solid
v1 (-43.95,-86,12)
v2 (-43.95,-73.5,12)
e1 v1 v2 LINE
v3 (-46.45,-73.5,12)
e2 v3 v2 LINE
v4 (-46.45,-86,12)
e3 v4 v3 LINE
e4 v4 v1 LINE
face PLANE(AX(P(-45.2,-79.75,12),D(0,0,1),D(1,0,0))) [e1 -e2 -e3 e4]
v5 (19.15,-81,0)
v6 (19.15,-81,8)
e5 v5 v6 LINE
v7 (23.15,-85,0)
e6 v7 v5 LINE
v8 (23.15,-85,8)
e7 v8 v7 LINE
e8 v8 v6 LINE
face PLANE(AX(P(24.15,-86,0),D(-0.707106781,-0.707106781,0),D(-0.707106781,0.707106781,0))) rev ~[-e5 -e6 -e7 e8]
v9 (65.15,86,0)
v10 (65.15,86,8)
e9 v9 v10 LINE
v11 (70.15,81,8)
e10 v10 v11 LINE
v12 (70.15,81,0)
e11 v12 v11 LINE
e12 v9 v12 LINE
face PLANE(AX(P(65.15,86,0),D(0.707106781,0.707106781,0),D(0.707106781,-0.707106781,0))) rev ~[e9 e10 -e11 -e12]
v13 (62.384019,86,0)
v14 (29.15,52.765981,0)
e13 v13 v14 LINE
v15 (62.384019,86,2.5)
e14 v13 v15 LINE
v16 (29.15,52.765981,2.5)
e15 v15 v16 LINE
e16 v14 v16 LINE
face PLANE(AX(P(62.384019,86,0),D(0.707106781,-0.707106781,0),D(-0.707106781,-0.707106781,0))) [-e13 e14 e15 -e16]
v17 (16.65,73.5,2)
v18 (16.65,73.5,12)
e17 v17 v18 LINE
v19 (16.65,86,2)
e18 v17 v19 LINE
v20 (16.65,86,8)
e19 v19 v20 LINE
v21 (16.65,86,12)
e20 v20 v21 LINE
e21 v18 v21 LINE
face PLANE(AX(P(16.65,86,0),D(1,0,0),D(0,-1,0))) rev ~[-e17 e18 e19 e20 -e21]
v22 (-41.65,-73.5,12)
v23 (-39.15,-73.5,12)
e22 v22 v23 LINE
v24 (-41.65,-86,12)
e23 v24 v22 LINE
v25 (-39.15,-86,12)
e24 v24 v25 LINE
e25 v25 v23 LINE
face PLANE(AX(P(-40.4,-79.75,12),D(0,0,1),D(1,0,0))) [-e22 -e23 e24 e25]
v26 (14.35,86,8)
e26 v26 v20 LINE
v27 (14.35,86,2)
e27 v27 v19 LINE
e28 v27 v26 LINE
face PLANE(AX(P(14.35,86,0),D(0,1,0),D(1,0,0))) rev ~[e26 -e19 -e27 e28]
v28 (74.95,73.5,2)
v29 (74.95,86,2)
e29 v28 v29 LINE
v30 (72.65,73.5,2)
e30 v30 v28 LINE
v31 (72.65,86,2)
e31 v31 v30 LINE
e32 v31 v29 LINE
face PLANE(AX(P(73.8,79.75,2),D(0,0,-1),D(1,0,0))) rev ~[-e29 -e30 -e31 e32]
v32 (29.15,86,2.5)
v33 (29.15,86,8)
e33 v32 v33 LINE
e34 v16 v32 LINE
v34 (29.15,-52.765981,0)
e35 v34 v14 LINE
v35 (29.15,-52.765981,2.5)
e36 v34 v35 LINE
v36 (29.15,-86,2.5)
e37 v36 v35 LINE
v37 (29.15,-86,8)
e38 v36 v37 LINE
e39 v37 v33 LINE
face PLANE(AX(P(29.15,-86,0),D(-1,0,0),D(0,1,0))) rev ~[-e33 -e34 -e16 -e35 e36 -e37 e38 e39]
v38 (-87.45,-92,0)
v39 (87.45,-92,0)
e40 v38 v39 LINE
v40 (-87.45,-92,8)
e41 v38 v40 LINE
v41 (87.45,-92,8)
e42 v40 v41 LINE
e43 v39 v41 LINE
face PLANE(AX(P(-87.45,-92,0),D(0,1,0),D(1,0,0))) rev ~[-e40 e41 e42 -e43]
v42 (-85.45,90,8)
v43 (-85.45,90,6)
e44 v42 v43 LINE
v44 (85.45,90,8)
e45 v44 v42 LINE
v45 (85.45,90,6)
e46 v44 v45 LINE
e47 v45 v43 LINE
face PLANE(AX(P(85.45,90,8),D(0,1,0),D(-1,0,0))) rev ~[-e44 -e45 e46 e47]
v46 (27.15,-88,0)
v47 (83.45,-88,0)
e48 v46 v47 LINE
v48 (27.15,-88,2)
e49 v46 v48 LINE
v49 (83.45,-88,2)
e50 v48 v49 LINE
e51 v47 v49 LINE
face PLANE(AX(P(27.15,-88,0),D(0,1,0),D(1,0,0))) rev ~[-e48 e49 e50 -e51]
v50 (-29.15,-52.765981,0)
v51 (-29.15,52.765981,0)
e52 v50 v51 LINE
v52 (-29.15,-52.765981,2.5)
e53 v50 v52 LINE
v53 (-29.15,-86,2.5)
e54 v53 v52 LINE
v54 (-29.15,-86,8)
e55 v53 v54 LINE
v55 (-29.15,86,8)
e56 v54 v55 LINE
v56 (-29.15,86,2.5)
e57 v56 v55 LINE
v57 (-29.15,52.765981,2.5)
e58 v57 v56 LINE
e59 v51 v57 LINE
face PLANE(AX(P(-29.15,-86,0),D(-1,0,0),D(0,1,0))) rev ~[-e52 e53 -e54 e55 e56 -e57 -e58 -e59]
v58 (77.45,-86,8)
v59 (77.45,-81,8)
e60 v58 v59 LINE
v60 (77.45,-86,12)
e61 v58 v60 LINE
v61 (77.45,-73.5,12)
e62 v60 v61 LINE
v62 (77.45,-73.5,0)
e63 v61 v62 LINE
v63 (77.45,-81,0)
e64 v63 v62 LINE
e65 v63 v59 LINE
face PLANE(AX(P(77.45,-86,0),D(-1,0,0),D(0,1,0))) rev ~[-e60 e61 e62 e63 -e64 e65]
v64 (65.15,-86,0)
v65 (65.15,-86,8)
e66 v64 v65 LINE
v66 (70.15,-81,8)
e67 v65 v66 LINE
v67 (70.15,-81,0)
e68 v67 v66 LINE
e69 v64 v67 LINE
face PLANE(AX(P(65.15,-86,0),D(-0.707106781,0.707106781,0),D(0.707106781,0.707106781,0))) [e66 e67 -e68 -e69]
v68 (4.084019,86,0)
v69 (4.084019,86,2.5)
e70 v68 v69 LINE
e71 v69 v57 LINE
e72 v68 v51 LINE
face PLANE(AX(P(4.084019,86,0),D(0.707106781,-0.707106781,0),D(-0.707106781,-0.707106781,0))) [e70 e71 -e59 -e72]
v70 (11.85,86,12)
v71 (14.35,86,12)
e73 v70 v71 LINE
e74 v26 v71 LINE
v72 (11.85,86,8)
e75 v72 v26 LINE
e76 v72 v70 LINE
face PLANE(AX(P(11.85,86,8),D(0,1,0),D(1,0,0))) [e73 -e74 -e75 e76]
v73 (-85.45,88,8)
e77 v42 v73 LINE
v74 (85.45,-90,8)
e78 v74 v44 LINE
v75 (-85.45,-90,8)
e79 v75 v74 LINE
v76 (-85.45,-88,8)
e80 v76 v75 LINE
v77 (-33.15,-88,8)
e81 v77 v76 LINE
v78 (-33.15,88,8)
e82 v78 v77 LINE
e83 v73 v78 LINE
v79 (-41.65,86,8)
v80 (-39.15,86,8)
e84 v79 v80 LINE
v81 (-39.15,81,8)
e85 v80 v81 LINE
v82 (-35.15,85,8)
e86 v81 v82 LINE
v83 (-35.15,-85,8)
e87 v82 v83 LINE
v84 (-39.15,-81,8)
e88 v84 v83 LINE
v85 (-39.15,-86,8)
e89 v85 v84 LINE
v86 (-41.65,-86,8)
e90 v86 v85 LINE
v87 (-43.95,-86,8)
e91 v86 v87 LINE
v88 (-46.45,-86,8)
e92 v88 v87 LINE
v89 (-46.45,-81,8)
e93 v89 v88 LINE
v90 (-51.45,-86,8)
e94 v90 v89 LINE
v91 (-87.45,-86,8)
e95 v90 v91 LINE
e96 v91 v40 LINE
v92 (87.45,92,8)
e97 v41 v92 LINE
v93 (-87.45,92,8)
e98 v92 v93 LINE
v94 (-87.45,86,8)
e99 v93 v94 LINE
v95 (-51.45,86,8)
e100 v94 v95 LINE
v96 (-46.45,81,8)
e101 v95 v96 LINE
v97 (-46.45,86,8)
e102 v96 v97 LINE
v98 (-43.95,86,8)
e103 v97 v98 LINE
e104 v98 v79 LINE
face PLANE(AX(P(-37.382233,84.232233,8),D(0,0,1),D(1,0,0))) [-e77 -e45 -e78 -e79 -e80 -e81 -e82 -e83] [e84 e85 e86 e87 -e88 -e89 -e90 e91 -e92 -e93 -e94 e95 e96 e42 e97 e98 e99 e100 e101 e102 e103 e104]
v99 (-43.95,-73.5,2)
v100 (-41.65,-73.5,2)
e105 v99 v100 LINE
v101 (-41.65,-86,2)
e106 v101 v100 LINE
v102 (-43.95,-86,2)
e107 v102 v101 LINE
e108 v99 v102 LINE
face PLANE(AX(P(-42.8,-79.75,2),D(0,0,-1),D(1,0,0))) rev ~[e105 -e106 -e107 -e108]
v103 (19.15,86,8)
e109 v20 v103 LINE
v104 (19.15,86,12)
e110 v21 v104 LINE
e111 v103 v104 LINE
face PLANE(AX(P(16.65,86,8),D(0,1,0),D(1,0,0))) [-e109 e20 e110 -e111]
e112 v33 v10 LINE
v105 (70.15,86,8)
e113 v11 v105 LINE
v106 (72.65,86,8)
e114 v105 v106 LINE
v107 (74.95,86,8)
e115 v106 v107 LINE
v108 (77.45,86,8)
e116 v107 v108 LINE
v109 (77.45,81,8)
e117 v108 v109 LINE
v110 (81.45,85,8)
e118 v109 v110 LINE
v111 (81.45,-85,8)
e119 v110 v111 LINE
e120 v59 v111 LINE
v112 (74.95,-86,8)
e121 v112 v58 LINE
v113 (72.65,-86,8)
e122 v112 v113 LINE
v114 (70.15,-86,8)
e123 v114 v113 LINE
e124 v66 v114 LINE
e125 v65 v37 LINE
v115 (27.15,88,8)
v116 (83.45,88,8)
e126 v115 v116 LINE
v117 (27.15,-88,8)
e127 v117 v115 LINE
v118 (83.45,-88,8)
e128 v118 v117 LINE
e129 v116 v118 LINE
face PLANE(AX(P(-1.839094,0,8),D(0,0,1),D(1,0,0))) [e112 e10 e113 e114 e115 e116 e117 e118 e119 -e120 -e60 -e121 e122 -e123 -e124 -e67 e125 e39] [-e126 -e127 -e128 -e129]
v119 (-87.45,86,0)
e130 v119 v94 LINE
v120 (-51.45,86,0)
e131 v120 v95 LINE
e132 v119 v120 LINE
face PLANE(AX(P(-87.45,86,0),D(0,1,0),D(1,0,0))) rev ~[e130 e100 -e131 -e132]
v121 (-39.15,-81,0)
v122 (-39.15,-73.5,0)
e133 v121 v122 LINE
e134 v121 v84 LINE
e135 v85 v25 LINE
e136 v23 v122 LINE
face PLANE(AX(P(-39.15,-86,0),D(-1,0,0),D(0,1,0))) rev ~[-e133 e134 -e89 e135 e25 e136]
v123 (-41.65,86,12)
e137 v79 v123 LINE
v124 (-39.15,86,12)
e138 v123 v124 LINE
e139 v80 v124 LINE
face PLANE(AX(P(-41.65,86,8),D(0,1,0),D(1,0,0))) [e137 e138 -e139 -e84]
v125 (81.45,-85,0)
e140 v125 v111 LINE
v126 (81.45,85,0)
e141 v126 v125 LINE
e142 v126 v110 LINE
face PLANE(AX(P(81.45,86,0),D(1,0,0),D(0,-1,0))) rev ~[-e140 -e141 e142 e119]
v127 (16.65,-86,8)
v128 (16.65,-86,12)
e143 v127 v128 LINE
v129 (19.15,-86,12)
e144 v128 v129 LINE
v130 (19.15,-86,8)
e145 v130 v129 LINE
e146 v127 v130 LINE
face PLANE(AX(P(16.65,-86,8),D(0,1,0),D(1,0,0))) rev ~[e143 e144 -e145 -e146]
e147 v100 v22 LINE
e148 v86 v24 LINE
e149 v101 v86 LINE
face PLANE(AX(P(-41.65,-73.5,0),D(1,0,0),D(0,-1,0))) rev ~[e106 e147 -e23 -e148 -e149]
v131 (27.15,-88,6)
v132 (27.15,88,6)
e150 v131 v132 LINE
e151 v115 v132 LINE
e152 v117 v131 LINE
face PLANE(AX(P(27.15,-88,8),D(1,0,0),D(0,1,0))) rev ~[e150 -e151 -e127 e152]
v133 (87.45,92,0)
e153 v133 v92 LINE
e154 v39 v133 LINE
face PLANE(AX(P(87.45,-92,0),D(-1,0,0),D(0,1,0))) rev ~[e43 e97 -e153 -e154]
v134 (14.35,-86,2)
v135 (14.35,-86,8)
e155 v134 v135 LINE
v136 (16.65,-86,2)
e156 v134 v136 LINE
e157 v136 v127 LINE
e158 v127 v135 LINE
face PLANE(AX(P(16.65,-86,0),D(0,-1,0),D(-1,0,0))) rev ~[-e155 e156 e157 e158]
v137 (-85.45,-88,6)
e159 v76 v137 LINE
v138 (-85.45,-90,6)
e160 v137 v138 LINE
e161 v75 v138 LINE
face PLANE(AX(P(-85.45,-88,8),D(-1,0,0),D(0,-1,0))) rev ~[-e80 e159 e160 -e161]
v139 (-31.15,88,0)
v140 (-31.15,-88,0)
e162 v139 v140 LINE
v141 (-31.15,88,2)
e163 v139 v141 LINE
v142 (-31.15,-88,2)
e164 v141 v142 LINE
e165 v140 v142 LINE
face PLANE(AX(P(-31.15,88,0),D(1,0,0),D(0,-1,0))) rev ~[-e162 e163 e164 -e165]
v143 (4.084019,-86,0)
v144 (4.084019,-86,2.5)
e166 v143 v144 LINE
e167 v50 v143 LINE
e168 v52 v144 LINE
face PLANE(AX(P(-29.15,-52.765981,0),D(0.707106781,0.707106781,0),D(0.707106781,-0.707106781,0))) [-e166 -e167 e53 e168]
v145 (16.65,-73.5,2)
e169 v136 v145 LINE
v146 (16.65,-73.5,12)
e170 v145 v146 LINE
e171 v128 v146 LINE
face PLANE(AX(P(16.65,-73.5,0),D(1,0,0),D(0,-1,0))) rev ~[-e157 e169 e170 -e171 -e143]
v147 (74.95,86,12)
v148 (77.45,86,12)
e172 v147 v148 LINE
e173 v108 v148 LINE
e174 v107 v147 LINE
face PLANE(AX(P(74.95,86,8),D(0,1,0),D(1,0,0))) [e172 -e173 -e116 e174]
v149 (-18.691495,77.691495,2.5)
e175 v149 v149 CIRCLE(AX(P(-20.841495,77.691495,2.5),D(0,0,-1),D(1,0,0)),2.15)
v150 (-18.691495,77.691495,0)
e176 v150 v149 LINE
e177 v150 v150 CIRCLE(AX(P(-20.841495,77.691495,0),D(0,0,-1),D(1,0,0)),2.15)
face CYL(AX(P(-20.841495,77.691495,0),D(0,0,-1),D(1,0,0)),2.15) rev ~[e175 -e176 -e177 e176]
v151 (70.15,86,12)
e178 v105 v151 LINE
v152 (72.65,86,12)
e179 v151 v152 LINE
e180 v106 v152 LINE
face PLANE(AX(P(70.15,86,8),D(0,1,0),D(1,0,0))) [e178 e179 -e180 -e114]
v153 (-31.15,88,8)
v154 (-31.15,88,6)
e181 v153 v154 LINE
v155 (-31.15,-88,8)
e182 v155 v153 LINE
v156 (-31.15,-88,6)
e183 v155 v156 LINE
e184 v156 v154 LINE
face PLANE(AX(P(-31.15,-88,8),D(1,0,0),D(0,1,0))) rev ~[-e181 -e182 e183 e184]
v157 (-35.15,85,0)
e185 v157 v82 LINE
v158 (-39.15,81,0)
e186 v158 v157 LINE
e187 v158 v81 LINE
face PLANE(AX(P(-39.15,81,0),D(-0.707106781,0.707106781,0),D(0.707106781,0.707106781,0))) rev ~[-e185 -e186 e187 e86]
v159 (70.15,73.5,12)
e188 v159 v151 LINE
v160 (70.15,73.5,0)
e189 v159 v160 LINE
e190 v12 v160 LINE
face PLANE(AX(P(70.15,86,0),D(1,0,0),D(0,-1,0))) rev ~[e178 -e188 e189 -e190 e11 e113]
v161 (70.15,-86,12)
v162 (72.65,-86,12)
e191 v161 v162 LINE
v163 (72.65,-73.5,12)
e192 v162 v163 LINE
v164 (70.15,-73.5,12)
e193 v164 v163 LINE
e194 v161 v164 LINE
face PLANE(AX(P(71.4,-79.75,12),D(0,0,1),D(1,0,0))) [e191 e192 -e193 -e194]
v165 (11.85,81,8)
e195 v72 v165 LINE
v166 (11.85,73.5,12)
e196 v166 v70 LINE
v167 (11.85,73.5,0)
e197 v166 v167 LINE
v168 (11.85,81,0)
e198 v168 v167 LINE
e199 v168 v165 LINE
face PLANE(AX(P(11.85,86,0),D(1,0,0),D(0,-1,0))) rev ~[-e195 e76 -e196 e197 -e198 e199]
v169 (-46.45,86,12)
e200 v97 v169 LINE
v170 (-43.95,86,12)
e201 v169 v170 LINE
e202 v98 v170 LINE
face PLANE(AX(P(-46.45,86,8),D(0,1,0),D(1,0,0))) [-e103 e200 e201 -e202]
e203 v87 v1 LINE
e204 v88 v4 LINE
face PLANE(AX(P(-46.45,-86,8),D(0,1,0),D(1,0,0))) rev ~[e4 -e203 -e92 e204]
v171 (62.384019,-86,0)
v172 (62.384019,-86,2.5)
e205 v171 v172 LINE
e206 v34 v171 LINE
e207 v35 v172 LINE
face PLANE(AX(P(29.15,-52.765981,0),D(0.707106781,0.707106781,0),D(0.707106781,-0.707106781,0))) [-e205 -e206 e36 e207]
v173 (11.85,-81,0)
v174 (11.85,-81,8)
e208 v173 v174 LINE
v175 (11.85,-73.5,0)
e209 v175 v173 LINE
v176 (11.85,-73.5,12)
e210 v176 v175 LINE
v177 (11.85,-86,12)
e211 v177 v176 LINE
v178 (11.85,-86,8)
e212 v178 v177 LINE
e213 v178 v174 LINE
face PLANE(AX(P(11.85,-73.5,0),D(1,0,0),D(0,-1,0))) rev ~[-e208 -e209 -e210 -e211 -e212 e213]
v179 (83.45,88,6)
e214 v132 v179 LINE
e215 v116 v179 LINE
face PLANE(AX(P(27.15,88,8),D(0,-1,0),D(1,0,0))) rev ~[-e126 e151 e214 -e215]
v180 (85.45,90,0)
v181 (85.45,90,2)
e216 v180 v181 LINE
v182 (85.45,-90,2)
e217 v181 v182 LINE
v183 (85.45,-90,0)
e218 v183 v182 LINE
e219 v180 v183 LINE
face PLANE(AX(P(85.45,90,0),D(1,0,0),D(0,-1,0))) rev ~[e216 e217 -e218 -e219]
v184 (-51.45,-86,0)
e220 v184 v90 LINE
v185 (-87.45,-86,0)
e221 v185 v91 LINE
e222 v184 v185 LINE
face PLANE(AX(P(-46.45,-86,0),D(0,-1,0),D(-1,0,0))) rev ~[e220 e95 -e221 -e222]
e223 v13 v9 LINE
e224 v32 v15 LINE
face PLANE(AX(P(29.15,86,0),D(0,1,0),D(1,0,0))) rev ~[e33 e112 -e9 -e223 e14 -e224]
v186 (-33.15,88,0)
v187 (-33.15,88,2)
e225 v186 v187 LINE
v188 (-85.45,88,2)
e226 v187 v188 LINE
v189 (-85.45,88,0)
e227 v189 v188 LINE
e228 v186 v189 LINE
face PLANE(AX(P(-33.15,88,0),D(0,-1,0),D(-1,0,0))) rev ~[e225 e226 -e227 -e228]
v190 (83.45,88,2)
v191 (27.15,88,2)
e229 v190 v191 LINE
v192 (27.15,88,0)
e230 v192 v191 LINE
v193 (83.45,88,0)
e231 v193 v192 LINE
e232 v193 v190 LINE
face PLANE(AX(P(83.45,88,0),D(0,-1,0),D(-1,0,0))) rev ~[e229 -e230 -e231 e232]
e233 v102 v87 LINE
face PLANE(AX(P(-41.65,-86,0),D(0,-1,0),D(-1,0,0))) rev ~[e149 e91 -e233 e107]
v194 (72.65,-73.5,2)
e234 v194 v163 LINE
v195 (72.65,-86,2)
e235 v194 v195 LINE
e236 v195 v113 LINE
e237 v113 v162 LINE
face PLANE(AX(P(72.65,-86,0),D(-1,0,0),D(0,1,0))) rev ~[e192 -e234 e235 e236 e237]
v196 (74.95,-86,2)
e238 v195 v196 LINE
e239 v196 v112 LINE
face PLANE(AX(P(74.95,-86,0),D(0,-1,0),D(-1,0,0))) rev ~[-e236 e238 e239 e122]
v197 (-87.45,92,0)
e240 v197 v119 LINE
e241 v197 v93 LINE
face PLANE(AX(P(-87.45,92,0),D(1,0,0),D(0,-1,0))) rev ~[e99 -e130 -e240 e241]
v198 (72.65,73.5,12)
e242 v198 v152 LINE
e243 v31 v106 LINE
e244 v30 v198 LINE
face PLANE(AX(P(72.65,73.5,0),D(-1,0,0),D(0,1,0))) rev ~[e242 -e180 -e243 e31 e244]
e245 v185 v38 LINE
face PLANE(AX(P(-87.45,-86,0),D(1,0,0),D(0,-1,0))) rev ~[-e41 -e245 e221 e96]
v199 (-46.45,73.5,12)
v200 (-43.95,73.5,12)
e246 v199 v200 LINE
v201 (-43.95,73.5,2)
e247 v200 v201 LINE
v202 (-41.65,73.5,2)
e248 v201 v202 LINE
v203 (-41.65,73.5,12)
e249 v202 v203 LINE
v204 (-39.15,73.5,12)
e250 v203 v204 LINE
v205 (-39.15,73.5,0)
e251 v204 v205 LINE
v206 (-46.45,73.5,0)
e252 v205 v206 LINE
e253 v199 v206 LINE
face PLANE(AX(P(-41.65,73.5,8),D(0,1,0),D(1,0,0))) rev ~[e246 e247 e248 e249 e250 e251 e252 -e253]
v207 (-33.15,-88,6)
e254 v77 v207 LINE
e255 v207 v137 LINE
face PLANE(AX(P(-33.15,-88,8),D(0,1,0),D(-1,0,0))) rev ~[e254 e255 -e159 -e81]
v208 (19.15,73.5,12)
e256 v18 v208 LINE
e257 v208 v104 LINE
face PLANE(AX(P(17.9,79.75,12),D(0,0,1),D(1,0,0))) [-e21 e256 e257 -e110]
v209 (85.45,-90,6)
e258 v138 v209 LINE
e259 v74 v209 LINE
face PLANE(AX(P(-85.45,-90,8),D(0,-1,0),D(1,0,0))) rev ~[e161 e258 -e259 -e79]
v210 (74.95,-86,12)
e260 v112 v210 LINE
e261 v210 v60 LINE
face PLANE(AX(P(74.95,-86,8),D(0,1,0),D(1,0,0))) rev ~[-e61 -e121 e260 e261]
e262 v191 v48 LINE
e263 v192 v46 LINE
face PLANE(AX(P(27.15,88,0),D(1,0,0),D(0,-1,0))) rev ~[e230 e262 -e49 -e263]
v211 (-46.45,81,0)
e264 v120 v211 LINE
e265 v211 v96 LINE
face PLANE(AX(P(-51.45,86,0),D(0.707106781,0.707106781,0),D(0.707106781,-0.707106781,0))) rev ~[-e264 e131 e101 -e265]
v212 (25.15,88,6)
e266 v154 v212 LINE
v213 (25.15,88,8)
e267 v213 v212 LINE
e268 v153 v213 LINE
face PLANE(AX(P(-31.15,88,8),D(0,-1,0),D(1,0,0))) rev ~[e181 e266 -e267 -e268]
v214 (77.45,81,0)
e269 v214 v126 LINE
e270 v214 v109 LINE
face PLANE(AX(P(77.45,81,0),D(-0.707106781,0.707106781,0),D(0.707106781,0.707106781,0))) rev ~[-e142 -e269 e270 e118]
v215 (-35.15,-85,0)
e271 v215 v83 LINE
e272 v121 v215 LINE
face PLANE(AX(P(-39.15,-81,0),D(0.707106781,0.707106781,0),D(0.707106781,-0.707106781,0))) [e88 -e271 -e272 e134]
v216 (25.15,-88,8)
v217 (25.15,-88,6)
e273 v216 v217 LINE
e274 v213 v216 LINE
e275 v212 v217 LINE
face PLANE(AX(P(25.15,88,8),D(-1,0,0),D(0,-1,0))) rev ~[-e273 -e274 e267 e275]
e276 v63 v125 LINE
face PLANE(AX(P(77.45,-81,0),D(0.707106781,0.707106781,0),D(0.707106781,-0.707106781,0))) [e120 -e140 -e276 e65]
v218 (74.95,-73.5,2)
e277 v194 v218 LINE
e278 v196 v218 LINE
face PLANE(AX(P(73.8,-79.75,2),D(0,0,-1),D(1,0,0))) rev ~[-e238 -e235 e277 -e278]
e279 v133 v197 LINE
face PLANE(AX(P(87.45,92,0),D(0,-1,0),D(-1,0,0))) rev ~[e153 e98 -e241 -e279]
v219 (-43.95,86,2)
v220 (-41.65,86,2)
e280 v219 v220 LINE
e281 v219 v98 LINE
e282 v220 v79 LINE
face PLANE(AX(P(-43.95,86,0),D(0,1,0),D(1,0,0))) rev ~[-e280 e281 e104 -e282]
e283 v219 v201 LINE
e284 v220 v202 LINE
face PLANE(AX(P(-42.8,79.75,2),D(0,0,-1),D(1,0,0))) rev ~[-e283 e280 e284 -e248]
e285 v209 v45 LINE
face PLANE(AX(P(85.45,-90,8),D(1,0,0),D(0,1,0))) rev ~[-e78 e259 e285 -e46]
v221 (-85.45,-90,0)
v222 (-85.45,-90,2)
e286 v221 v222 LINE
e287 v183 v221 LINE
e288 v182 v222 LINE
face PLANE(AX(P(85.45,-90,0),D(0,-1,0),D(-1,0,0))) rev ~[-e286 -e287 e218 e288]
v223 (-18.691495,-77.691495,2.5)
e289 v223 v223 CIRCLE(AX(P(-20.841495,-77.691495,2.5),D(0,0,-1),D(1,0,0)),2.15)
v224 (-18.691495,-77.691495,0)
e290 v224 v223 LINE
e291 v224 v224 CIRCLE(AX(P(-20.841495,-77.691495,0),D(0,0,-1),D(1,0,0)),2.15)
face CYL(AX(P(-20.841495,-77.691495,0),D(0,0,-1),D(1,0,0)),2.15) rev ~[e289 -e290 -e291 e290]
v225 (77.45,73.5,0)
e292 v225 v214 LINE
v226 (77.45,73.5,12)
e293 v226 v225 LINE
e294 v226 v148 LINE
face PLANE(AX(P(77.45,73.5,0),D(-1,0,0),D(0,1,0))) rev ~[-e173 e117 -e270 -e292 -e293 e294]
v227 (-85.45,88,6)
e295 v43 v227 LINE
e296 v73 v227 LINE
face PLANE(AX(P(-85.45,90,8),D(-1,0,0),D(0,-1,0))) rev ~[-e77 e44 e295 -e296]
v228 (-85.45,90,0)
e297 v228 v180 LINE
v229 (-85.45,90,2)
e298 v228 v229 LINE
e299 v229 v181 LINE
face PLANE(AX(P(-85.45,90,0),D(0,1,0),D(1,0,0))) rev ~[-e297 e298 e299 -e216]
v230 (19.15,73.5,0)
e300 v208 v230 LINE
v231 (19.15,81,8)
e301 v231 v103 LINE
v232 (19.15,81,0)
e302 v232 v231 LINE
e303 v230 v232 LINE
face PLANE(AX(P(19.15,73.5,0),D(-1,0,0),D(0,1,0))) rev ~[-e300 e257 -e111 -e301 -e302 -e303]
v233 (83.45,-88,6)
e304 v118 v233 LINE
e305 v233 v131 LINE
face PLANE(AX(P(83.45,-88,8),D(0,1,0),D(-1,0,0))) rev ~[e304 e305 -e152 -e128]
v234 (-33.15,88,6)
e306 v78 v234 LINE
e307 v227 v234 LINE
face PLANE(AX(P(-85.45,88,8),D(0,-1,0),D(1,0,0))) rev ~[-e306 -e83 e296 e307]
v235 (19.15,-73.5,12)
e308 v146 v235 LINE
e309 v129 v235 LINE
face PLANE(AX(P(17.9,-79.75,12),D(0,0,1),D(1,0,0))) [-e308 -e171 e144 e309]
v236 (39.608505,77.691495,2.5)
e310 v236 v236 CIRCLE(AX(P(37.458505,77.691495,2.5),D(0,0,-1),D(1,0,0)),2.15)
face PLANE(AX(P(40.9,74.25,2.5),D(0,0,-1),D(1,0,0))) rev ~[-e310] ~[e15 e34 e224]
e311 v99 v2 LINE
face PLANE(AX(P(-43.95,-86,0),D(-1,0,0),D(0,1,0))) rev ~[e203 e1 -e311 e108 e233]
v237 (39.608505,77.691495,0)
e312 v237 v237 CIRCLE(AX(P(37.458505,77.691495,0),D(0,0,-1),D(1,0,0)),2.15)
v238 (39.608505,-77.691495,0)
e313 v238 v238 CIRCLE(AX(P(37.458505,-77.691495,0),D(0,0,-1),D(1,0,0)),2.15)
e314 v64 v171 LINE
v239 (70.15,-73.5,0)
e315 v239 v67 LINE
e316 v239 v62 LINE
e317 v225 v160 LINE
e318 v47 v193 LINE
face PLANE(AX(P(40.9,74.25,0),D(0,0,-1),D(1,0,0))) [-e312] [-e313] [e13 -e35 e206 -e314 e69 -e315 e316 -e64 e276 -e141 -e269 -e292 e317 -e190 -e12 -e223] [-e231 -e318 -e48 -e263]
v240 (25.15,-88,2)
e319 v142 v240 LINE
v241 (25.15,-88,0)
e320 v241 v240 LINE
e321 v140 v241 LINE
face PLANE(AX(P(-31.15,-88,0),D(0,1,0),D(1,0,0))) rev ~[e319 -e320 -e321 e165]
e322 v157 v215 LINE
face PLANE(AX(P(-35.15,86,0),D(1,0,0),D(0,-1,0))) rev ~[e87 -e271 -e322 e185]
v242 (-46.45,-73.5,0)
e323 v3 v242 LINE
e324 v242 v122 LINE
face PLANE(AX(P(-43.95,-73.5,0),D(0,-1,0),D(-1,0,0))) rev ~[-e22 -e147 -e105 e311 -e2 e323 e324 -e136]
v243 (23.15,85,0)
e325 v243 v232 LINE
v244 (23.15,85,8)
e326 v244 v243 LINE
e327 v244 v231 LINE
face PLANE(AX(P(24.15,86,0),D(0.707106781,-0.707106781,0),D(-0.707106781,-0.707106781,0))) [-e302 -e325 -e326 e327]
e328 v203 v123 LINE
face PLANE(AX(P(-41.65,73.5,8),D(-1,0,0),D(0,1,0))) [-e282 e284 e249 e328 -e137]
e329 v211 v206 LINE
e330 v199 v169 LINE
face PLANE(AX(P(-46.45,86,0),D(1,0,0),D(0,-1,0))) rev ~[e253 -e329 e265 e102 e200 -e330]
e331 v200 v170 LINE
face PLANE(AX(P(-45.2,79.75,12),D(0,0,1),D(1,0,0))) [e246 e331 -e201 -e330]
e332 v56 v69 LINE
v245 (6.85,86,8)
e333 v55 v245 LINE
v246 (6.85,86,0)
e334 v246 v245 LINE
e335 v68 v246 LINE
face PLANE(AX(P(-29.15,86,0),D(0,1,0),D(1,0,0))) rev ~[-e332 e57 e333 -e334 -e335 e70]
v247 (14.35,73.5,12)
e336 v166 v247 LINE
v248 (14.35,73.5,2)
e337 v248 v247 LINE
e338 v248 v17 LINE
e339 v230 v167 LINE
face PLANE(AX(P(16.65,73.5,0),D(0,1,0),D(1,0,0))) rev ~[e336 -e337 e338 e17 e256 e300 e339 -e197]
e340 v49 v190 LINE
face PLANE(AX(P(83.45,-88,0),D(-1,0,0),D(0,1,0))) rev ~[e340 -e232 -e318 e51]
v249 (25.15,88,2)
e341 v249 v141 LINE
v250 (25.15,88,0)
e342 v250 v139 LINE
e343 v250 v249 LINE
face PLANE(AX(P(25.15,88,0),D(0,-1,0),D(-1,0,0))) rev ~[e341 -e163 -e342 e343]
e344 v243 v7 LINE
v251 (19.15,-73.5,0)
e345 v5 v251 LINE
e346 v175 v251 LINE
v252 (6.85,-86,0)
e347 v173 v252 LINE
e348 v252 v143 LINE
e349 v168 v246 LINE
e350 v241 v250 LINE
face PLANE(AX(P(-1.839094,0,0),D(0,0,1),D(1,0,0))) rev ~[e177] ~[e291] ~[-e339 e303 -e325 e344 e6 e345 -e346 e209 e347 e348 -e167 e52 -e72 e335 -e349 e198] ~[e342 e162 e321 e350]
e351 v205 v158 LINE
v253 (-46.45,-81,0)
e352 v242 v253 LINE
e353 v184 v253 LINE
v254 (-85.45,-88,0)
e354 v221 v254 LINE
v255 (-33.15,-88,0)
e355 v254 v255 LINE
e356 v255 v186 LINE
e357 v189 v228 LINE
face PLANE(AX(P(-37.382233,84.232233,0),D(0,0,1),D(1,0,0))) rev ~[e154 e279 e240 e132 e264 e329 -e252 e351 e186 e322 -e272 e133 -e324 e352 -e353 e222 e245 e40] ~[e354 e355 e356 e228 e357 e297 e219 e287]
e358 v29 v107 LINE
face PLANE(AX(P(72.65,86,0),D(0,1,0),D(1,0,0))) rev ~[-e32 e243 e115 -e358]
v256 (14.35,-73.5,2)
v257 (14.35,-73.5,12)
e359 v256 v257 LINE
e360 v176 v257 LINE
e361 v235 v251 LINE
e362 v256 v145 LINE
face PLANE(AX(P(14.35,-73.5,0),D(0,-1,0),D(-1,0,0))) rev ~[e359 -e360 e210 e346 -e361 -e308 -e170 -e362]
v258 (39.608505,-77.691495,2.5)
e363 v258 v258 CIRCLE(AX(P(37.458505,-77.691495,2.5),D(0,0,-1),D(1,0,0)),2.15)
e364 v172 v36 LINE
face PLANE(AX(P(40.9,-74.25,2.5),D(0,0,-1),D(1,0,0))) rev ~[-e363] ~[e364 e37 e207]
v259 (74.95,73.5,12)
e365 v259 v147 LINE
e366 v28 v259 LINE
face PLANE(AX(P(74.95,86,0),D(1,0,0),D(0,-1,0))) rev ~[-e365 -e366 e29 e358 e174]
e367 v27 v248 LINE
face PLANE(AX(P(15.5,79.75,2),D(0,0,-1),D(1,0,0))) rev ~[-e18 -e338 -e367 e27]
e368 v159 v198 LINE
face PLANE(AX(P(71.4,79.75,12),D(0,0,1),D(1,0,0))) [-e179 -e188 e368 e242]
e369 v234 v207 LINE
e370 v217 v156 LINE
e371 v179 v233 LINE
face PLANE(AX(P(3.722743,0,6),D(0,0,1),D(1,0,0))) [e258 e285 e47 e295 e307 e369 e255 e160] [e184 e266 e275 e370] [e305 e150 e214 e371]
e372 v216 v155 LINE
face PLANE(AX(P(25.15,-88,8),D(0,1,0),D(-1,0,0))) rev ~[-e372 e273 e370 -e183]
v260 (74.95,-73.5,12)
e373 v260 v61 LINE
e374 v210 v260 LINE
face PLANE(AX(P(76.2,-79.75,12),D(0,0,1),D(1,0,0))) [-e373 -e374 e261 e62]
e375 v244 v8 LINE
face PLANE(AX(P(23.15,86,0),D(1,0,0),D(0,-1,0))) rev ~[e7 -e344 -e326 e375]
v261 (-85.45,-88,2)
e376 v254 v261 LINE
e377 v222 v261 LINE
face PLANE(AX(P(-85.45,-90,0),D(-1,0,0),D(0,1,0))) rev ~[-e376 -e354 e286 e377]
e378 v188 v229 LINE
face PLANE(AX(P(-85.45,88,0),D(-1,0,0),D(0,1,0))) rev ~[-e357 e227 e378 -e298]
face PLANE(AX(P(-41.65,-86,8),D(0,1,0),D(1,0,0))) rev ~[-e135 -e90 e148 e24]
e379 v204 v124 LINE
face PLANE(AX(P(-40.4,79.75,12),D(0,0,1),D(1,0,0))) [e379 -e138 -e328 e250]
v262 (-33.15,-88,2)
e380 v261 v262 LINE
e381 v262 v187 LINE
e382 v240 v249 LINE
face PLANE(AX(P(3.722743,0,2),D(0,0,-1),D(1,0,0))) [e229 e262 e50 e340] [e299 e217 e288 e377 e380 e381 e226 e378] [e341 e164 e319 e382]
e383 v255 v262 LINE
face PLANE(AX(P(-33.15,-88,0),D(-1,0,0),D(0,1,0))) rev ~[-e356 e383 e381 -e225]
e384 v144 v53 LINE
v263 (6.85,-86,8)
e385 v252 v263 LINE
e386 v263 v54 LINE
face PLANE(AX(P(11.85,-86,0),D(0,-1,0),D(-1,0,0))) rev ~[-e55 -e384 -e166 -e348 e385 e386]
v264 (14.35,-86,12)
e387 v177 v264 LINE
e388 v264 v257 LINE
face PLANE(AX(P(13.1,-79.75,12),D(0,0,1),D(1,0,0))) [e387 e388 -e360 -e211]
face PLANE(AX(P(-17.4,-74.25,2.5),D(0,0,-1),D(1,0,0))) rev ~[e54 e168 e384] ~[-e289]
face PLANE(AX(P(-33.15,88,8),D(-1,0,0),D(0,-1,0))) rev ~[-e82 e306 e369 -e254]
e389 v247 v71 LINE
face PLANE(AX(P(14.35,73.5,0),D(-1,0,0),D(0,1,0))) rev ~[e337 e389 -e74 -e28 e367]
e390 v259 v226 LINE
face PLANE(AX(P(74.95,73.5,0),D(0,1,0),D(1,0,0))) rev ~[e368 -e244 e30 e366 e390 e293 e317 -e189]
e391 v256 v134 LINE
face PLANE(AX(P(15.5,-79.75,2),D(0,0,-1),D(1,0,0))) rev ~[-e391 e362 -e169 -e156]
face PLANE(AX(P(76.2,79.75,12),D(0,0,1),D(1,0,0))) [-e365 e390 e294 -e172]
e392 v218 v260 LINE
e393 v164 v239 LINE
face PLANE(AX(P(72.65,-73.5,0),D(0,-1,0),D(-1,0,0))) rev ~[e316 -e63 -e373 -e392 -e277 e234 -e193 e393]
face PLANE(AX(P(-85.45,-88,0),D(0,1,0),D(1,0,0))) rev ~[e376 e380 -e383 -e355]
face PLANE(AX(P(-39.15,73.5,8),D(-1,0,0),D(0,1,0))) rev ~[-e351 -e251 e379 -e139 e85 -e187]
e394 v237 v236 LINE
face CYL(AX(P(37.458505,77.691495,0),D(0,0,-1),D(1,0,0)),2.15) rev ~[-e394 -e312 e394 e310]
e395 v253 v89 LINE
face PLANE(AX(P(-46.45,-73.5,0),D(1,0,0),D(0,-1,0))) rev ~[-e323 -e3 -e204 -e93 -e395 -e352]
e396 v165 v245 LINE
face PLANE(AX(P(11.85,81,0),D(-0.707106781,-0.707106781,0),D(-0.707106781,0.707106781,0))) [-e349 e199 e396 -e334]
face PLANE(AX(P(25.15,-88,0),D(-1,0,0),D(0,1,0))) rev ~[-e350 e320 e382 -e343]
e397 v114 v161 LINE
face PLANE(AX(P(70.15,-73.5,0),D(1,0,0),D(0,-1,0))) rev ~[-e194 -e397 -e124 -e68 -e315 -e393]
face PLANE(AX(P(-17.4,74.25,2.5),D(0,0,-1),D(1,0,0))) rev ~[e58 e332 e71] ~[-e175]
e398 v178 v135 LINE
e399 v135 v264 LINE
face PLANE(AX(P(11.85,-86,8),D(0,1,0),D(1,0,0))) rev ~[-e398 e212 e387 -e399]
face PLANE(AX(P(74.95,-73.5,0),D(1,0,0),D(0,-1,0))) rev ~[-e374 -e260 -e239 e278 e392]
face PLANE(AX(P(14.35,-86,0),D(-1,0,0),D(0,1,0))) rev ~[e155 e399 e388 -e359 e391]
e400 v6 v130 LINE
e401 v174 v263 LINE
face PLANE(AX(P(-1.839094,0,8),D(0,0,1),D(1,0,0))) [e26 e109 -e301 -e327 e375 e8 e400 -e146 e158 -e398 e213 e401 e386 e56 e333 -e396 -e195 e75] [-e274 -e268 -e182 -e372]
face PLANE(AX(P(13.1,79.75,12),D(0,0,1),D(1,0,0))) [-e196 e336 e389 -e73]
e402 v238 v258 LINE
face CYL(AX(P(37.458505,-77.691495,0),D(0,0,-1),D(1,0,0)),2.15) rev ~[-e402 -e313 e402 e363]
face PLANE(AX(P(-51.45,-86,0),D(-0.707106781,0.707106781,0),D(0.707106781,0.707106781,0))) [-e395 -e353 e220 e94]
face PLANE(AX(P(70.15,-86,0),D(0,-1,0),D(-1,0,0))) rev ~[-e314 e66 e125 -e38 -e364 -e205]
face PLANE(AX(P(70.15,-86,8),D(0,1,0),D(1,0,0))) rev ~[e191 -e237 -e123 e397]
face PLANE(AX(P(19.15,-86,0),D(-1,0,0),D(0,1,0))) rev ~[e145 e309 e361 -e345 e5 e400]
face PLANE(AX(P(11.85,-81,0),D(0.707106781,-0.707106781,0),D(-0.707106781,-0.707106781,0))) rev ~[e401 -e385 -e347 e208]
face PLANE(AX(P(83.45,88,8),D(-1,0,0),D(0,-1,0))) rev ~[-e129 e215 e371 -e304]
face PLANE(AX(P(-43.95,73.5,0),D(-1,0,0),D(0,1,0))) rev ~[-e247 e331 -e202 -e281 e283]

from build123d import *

# Parameters (mm, degrees)
F1_DEPTH     = 8
F2_W         = 2.5
F2_H         = 12.5
F3_DEPTH     = 4
F4_W         = 7.3
F4_H         = 12.5
F5_DEPTH     = 2
F7_DEPTH     = 2
F9_DEPTH     = 2
F10_T1_DEPTH = 8
F11_R        = 2.15
F12_DEPTH    = 2.5


# Not quite as in the source:
# - a fillet or chamfer that OpenCascade refuses, or shapes differently, is made with other operations: its cross-section is extruded or revolved along the edge and cut away or added


with BuildPart() as f1:
    # F0 (on Top) → F1 (new body)
    with BuildSketch(Plane.XY):
        Polygon((87.45, 92), (-87.45, 92), (-87.45, 86), (-46.45, 86), (-46.45, 73.5), (-43.95, 73.5), (-43.95, 86), (-41.65, 86), (-41.65, 73.5), (-39.15, 73.5), (-39.15, 86), (-35.15, 86), (-35.15, 0), (-35.15, -86), (-39.15, -86), (-39.15, -73.5), (-41.65, -73.5), (-41.65, -86), (-43.95, -86), (-43.95, -73.5), (-46.45, -73.5), (-46.45, -86), (-87.45, -86), (-87.45, -92), (87.45, -92), (87.45, 0), align=None)
        Polygon((-29.15, -86), (-29.15, 0), (-29.15, 86), (11.85, 86), (11.85, 73.5), (14.35, 73.5), (14.35, 86), (16.65, 86), (16.65, 73.5), (19.15, 73.5), (19.15, 86), (23.15, 86), (23.15, 0), (23.15, -86), (19.15, -86), (19.15, -73.5), (16.65, -73.5), (16.65, -86), (14.35, -86), (14.35, -73.5), (11.85, -73.5), (11.85, -86), align=None, mode=Mode.SUBTRACT)
        Polygon((29.15, -86), (29.15, 0), (29.15, 86), (70.15, 86), (70.15, 73.5), (72.65, 73.5), (72.65, 86), (74.95, 86), (74.95, 73.5), (77.45, 73.5), (77.45, 86), (81.45, 86), (81.45, 0), (81.45, -86), (77.45, -86), (77.45, -73.5), (74.95, -73.5), (74.95, -86), (72.65, -86), (72.65, -73.5), (70.15, -73.5), (70.15, -86), align=None, mode=Mode.SUBTRACT)
    extrude(amount=F1_DEPTH)

    # F2 (on face) → F3 (join)
    with BuildSketch(Plane.XY.offset(8)):
        with Locations((-40.4, 79.75)):
            Rectangle(F2_W, F2_H)
        with Locations((-45.2, 79.75)):
            Rectangle(F2_W, F2_H)
        with Locations((13.1, 79.75)):
            Rectangle(F2_W, F2_H)
        with Locations((17.9, 79.75)):
            Rectangle(F2_W, F2_H)
        with Locations((76.2, 79.75)):
            Rectangle(F2_W, F2_H)
        with Locations((71.4, 79.75)):
            Rectangle(F2_W, F2_H)
        with Locations((76.2, -79.75)):
            Rectangle(F2_W, F2_H)
        with Locations((71.4, -79.75)):
            Rectangle(F2_W, F2_H)
        with Locations((-40.4, -79.75)):
            Rectangle(F2_W, F2_H)
        with Locations((-45.2, -79.75)):
            Rectangle(F2_W, F2_H)
        with Locations((17.9, -79.75)):
            Rectangle(F2_W, F2_H)
        with Locations((13.1, -79.75)):
            Rectangle(F2_W, F2_H)
    extrude(amount=F3_DEPTH)

    # F4 (on face) → F5 (join)
    with BuildSketch(Plane(origin=(0, 0, 0), x_dir=(1, 0, 0), z_dir=(0, 0, -1))):
        with Locations((-42.8, 79.75)):
            Rectangle(F4_W, F4_H)
        with Locations((15.5, 79.75)):
            Rectangle(F4_W, F4_H)
        with Locations((73.8, 79.75)):
            Rectangle(F4_W, F4_H)
        with Locations((15.5, -79.75)):
            Rectangle(F4_W, F4_H)
        with Locations((-42.8, -79.75)):
            Rectangle(F4_W, F4_H)
        with Locations((73.8, -79.75)):
            Rectangle(F4_W, F4_H)
    extrude(amount=-F5_DEPTH)

    # F6 (on face) → F7 (cut)
    with BuildSketch(Plane.XY.offset(8)):
        Polygon((85.45, 90), (-85.45, 90), (-85.45, 88), (-33.15, 88), (-33.15, 0), (-33.15, -88), (-85.45, -88), (-85.45, -90), (85.45, -90), (85.45, 0), align=None)
        Polygon((25.15, 88), (25.15, 0), (25.15, -88), (-31.15, -88), (-31.15, 0), (-31.15, 88), align=None, mode=Mode.SUBTRACT)
        Polygon((27.15, 88), (83.45, 88), (83.45, 0), (83.45, -88), (27.15, -88), (27.15, 0), align=None, mode=Mode.SUBTRACT)
    extrude(amount=-F7_DEPTH, mode=Mode.SUBTRACT)

    # F8 (on face) → F9 (cut)
    with BuildSketch(Plane(origin=(0, 0, 0), x_dir=(1, 0, 0), z_dir=(0, 0, -1))):
        Polygon((85.45, 90), (-85.45, 90), (-85.45, 88), (-33.15, 88), (-33.15, 0), (-33.15, -88), (-85.45, -88), (-85.45, -90), (85.45, -90), (85.45, 0), align=None)
        Polygon((25.15, 88), (25.15, 0), (25.15, -88), (-31.15, -88), (-31.15, 0), (-31.15, 88), align=None, mode=Mode.SUBTRACT)
        Polygon((27.15, 88), (83.45, 88), (83.45, 0), (83.45, -88), (27.15, -88), (27.15, 0), align=None, mode=Mode.SUBTRACT)
    extrude(amount=-F9_DEPTH, mode=Mode.SUBTRACT)

    # F10: chamfer of 5 on 12 edges, made by hand

    # F10_s2 → F10_t1 (join)
    with BuildSketch(Plane.XY):
        Polygon((-39.15, 81), (-34.15, 86), (-39.15, 86), align=None)
        Polygon((-51.45, 86), (-46.45, 81), (-46.45, 86), align=None)
        Polygon((11.85, 81), (6.85, 86), (11.85, 86), align=None)
        Polygon((24.15, 86), (19.15, 81), (19.15, 86), align=None)
        Polygon((77.45, 81), (82.45, 86), (77.45, 86), align=None)
        Polygon((65.15, 86), (70.15, 81), (70.15, 86), align=None)
        Polygon((77.45, -81), (82.45, -86), (77.45, -86), align=None)
        Polygon((65.15, -86), (70.15, -81), (70.15, -86), align=None)
        Polygon((11.85, -81), (6.85, -86), (11.85, -86), align=None)
        Polygon((-51.45, -86), (-46.45, -81), (-46.45, -86), align=None)
        Polygon((-39.15, -81), (-34.15, -86), (-39.15, -86), align=None)
        Polygon((24.15, -86), (19.15, -81), (19.15, -86), align=None)
    extrude(amount=F10_T1_DEPTH)

    # F11 (on face) → F12 (join)
    with BuildSketch(Plane(origin=(0, 0, 0), x_dir=(1, 0, 0), z_dir=(0, 0, -1))):
        Polygon((29.15, -52.7659812842), (29.15, -86), (62.3840187158, -86), align=None)
        with Locations((37.4585046789, -77.6914953211)):
            Circle(F11_R, mode=Mode.SUBTRACT)
        Polygon((29.15, 86), (29.15, 52.7659812842), (62.3840187158, 86), align=None)
        with Locations((37.4585046789, 77.6914953211)):
            Circle(F11_R, mode=Mode.SUBTRACT)
        Polygon((-29.15, -52.7659812842), (-29.15, -86), (4.0840187158, -86), align=None)
        with Locations((-20.8414953211, -77.6914953211)):
            Circle(F11_R, mode=Mode.SUBTRACT)
        Polygon((-29.15, 86), (-29.15, 52.7659812842), (4.0840187158, 86), align=None)
        with Locations((-20.8414953211, 77.6914953211)):
            Circle(F11_R, mode=Mode.SUBTRACT)
    extrude(amount=-F12_DEPTH)


solid = f1.part
